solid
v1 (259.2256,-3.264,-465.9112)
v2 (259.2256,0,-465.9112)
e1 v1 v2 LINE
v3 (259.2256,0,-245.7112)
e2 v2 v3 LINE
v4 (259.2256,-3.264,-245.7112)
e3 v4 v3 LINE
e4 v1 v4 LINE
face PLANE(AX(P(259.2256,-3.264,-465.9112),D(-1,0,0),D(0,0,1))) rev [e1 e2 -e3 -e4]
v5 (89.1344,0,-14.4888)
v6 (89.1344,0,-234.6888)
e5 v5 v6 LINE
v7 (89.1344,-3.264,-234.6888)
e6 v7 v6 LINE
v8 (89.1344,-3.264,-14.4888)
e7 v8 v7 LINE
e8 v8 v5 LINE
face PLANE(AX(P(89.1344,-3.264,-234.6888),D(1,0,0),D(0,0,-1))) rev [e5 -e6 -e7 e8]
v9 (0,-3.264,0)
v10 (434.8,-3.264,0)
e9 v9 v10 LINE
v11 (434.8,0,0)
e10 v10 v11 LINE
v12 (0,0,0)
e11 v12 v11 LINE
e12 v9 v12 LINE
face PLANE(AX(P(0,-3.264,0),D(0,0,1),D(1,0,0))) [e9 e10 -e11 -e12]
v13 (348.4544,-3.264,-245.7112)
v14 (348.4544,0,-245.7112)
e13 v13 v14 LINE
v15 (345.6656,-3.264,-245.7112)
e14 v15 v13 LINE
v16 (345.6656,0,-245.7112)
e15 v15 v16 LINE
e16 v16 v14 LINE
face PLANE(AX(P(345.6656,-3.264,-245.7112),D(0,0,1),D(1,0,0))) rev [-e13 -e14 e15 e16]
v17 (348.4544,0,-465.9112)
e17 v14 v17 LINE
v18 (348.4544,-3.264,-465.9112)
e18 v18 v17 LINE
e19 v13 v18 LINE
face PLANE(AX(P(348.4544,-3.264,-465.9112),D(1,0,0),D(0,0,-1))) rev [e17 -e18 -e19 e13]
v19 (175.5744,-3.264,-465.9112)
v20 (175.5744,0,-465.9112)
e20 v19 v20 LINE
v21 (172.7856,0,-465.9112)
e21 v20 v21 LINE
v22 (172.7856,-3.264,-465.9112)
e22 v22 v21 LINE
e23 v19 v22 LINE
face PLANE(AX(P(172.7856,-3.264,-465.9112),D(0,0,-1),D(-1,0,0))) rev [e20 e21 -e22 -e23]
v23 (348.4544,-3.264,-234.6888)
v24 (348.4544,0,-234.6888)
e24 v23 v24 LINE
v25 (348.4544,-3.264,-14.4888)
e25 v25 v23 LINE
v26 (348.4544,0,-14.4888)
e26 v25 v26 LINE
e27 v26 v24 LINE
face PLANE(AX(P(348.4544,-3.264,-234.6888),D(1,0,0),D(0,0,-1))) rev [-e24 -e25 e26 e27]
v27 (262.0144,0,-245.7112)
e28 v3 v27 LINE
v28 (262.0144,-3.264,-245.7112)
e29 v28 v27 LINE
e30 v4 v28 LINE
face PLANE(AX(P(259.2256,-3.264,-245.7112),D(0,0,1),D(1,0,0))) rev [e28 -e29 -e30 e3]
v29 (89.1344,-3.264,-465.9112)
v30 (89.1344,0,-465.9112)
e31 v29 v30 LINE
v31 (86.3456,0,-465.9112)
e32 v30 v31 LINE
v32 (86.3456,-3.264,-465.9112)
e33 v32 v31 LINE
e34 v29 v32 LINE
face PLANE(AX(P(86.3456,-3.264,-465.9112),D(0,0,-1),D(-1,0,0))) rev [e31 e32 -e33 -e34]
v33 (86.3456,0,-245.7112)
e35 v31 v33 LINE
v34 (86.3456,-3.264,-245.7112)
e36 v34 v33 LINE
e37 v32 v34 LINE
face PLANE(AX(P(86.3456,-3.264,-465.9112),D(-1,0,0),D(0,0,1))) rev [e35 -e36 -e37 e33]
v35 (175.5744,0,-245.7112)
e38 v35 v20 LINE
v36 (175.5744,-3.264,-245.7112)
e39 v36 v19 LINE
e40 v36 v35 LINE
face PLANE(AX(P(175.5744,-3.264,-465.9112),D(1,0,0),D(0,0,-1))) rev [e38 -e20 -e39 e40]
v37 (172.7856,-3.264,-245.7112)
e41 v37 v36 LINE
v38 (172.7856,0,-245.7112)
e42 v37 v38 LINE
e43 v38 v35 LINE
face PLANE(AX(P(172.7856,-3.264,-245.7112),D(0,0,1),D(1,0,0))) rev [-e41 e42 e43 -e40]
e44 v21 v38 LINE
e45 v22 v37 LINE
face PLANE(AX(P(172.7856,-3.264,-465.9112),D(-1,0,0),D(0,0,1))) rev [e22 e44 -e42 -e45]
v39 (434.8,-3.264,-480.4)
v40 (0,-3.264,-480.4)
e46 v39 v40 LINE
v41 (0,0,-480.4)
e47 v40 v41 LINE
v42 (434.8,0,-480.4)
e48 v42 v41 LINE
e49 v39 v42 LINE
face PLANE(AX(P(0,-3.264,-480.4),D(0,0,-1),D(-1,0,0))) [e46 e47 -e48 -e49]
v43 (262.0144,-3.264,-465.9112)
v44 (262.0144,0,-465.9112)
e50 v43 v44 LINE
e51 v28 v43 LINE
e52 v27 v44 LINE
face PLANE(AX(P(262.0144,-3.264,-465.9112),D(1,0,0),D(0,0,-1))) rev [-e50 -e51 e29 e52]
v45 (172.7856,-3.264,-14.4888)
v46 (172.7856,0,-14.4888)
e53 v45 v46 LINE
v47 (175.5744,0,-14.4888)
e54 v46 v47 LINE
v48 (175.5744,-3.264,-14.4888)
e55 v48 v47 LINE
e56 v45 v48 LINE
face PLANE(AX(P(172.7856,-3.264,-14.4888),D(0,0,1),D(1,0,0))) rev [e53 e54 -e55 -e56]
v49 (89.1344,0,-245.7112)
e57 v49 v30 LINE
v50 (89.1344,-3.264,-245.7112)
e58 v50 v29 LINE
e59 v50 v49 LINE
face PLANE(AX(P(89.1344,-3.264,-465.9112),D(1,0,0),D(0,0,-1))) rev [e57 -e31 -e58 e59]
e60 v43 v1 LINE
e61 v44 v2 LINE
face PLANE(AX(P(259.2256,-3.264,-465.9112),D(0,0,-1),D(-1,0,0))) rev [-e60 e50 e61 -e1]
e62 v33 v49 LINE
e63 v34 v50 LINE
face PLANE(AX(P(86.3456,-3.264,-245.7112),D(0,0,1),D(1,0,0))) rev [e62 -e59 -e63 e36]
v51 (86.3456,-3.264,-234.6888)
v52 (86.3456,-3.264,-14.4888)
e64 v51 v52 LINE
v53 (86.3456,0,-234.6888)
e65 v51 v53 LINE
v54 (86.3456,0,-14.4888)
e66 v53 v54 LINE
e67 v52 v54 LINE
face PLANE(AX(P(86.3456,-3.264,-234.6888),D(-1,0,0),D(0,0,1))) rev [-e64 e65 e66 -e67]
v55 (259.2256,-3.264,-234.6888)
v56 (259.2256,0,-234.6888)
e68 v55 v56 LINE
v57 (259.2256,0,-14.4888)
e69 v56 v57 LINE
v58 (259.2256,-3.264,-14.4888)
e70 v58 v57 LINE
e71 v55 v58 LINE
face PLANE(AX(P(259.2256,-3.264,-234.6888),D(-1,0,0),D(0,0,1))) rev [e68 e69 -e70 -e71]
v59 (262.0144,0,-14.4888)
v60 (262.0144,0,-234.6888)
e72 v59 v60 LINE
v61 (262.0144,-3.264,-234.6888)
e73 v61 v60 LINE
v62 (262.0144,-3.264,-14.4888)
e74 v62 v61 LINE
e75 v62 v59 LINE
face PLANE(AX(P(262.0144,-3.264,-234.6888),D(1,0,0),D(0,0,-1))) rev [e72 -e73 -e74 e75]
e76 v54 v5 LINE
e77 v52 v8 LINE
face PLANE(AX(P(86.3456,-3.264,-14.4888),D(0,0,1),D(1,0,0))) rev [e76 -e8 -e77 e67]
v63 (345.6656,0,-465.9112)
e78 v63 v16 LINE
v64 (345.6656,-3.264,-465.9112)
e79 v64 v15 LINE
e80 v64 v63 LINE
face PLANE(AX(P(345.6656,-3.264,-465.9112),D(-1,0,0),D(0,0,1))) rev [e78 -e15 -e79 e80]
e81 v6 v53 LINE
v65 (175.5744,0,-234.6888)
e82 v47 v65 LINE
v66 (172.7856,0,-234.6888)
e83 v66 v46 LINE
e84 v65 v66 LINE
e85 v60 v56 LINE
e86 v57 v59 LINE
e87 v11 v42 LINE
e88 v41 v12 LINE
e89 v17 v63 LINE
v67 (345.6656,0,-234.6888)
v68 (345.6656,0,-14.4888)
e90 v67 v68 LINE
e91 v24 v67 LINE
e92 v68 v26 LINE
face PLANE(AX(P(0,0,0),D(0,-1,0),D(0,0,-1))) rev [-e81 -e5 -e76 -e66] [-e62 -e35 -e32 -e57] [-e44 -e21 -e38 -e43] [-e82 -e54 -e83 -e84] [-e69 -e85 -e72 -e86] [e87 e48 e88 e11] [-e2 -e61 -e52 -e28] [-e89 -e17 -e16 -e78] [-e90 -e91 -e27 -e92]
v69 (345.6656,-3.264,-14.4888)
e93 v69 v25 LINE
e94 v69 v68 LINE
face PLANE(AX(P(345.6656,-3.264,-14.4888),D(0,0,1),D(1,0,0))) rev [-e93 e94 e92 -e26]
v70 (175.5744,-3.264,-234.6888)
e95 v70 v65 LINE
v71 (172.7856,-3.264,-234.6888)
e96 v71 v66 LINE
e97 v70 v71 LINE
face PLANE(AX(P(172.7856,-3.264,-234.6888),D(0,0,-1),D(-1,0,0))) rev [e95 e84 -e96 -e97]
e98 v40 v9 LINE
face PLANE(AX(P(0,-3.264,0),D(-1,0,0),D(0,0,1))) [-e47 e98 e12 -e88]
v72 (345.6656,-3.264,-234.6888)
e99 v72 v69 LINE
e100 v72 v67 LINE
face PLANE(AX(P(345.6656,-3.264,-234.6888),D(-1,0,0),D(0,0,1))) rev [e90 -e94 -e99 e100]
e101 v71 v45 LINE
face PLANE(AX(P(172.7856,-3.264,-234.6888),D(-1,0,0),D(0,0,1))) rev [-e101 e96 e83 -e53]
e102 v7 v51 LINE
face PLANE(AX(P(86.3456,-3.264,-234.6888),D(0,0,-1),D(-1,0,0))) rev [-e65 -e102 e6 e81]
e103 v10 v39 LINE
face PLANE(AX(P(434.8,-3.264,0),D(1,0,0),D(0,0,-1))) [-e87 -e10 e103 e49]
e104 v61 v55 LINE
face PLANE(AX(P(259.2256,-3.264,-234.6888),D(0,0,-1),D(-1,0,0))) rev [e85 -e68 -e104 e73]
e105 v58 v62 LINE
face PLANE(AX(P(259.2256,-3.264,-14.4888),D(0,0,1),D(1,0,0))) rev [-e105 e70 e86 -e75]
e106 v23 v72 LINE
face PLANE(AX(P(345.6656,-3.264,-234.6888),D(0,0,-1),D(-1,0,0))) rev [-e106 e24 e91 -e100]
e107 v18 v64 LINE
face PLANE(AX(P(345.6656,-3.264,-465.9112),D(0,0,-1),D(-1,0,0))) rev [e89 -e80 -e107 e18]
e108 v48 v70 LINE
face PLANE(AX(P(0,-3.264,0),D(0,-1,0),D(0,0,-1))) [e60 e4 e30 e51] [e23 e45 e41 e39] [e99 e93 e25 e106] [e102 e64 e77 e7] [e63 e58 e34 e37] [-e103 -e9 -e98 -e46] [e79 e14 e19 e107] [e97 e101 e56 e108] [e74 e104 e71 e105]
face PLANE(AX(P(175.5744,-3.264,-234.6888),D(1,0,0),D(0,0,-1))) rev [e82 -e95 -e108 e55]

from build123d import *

# Parameters (mm, degrees)
SKETCH1_W          = 434.8
SKETCH1_H          = 480.4
SKETCH1_W_2        = 2.7888
SKETCH1_H_2        = 220.2
BASE_FLANGE2_DEPTH = 3.264


# Sheet-metal steps are written as plain solids
with BuildPart() as part:
    # Sketch1 → Base-Flange2 (new body)
    with BuildSketch(Plane(origin=(0, 0, 0), x_dir=(1, 0, 0), z_dir=(0, 1, 0))):
        with Locations((217.4, 240.2)):
            Rectangle(SKETCH1_W, SKETCH1_H)
        with Locations((87.74, 355.8112)):
            Rectangle(SKETCH1_W_2, SKETCH1_H_2, mode=Mode.SUBTRACT)
        with Locations((87.74, 124.5888)):
            Rectangle(SKETCH1_W_2, SKETCH1_H_2, mode=Mode.SUBTRACT)
        with Locations((174.18, 355.8112)):
            Rectangle(SKETCH1_W_2, SKETCH1_H_2, mode=Mode.SUBTRACT)
        with Locations((174.18, 124.5888)):
            Rectangle(SKETCH1_W_2, SKETCH1_H_2, mode=Mode.SUBTRACT)
        with Locations((260.62, 355.8112)):
            Rectangle(SKETCH1_W_2, SKETCH1_H_2, mode=Mode.SUBTRACT)
        with Locations((260.62, 124.5888)):
            Rectangle(SKETCH1_W_2, SKETCH1_H_2, mode=Mode.SUBTRACT)
        with Locations((347.06, 355.8112)):
            Rectangle(SKETCH1_W_2, SKETCH1_H_2, mode=Mode.SUBTRACT)
        with Locations((347.06, 124.5888)):
            Rectangle(SKETCH1_W_2, SKETCH1_H_2, mode=Mode.SUBTRACT)
    extrude(amount=-BASE_FLANGE2_DEPTH)


solid = part.part
